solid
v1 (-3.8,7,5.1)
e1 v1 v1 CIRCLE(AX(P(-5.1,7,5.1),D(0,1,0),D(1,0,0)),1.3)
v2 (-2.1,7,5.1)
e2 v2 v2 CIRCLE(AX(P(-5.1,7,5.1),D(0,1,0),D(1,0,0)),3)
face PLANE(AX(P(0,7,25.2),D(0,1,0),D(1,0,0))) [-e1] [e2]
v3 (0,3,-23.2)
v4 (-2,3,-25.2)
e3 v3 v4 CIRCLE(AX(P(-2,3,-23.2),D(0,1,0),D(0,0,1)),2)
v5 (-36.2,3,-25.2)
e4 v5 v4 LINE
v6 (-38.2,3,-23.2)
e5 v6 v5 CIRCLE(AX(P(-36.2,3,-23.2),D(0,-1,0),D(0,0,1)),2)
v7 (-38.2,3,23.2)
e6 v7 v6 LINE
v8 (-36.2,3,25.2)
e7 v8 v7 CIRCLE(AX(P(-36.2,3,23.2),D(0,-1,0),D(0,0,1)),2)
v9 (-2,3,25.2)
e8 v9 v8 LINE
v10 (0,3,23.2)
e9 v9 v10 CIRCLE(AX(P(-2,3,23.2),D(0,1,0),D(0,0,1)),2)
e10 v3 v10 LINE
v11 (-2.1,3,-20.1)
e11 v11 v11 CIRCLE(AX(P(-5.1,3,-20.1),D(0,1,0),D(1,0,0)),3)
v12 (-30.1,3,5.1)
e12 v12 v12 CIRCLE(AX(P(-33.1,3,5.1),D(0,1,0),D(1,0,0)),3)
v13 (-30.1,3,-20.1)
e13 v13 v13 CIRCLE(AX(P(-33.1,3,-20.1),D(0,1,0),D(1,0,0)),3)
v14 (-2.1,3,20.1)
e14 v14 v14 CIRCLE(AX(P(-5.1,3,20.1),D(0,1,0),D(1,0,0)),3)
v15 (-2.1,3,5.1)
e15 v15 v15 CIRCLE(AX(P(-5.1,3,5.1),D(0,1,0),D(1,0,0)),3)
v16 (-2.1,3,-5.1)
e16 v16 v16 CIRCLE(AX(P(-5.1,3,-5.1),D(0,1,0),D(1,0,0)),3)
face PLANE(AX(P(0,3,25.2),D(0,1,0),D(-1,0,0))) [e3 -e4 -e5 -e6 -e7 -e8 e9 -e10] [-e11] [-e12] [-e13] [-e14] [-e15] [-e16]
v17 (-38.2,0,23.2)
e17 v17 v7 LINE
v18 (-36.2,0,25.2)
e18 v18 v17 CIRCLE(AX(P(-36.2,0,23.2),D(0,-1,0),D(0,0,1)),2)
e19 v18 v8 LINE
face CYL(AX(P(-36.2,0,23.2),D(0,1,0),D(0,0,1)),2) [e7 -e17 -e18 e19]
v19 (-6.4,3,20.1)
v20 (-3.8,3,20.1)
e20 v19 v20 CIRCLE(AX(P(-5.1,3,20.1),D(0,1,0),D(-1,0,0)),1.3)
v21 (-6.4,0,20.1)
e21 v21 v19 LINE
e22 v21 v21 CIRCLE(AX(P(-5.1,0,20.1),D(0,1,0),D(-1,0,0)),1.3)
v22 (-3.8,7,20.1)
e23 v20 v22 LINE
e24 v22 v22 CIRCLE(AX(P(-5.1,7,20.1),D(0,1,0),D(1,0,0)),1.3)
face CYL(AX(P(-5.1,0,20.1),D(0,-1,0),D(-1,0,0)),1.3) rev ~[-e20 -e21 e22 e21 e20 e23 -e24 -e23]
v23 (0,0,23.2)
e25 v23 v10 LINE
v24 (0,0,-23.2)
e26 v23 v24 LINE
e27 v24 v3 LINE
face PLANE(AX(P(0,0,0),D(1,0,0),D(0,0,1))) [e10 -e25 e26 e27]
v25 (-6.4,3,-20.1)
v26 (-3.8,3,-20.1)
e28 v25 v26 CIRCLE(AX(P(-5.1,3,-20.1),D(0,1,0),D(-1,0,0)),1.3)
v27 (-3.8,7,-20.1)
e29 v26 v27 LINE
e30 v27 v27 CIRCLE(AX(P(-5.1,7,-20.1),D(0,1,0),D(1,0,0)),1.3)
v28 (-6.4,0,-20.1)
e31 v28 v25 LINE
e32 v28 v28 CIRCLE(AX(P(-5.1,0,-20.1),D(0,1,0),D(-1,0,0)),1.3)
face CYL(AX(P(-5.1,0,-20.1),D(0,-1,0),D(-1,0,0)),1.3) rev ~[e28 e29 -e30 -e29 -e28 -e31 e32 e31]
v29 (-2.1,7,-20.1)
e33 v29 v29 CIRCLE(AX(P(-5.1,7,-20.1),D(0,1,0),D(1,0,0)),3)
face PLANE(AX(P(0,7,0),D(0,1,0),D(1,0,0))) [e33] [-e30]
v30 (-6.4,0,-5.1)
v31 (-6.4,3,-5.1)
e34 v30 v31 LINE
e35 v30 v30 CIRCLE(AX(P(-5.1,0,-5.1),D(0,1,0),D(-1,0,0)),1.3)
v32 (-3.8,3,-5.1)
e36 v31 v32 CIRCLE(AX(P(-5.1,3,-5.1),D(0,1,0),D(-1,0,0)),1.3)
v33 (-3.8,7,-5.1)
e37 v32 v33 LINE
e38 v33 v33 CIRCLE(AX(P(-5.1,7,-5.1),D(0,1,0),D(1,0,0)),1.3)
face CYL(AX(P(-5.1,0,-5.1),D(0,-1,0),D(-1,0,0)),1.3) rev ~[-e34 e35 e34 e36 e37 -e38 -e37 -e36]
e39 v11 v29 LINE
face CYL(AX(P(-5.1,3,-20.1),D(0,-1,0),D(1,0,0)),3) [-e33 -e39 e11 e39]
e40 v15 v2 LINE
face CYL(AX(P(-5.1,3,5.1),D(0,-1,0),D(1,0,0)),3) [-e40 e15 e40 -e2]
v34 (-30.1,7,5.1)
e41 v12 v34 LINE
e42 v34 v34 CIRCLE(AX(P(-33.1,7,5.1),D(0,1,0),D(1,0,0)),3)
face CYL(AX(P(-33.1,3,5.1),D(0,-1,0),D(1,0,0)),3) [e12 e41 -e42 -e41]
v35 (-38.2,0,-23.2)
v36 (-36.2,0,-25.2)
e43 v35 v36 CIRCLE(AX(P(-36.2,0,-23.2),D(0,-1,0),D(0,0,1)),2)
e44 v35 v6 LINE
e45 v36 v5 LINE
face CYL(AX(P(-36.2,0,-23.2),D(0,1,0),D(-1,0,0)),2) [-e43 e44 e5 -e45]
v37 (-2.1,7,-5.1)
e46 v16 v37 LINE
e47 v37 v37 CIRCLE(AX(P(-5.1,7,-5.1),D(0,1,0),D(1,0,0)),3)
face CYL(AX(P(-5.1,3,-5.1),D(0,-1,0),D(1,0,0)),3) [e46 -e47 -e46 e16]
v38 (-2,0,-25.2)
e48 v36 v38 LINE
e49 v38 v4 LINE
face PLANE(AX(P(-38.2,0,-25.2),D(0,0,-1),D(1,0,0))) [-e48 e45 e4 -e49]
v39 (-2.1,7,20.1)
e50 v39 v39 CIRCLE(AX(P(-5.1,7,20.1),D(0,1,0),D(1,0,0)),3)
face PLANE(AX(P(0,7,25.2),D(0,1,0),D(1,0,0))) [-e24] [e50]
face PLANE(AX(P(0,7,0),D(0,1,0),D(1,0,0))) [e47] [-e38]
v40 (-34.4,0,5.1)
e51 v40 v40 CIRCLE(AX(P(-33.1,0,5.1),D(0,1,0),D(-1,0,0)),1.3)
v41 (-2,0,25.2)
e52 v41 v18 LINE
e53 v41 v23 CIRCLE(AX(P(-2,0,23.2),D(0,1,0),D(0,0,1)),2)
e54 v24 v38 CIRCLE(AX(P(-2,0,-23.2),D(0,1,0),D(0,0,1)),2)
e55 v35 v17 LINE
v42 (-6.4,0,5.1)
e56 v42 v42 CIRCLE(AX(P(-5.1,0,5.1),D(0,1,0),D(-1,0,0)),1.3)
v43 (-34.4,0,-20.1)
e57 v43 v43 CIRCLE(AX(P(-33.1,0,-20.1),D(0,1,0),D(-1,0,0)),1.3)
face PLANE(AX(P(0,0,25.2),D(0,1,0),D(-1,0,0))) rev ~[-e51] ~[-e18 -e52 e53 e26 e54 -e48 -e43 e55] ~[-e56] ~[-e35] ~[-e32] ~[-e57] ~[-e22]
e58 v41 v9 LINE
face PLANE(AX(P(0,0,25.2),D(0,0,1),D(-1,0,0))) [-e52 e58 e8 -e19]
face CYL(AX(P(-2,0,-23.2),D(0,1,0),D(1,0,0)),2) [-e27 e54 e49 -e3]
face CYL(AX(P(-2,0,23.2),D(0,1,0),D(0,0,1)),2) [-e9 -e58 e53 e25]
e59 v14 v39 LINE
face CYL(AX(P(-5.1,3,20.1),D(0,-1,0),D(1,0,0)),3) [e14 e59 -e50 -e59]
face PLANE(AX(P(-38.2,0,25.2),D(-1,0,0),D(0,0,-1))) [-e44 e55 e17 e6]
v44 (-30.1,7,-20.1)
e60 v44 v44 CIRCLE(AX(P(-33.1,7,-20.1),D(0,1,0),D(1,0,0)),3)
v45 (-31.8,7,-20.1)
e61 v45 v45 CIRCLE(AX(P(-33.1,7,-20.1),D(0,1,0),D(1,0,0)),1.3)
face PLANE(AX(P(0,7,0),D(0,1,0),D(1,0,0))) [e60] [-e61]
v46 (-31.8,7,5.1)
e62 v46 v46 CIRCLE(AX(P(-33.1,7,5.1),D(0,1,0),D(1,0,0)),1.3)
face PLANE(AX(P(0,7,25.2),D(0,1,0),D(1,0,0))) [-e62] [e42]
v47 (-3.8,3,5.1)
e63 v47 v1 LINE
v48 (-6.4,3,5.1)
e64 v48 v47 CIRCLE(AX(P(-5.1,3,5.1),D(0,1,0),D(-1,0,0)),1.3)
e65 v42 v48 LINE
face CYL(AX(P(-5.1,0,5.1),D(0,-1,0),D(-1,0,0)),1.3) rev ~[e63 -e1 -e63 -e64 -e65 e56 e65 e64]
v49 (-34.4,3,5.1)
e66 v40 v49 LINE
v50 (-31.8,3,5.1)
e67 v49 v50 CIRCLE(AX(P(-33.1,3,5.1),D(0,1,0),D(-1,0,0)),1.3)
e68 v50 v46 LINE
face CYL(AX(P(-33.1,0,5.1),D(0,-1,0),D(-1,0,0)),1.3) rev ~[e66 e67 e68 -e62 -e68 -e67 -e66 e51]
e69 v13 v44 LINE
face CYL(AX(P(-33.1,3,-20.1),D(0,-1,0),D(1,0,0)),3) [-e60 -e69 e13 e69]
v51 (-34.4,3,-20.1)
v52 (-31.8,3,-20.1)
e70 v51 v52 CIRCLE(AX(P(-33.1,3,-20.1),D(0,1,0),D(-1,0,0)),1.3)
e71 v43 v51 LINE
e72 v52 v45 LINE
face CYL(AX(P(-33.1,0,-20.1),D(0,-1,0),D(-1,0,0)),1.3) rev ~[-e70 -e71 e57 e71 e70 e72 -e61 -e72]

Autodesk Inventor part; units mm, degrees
ref_plane "YZ Plane" through (0, 0, 0) normal (1, 0, 0) x (0, 1, 0)
ref_plane "XZ Plane" through (0, 0, 0) normal (0, 1, 0) x (-1, 0, 0)
ref_plane "XY Plane" through (0, 0, 0) normal (0, 0, 1) x (1, 0, 0)
sketch "Sketch1" plane through (0, 0, 0) normal (0, 1, 0) x (-1, 0, 0)
  line L0 (0, 0) -> (38.2, 0)
  line L1 (38.2, 0) -> (38.2, -25.2)
  line L2 (38.2, -25.2) -> (0, -25.2)
  line L3 (0, -25.2) -> (0, 0)
  circle A0 centre (33.1, -20.1) radius 1.3
  circle A1 centre (5.1, -5.1) radius 1.3
  circle A2 centre (5.1, -20.1) radius 1.3
  line L4 (0, 0) -> (38.2, -25.2) construction
  line L5 (38.2, 0) -> (0, -25.2) construction
  line L6 (5.1, -5.1) -> (33.1, -20.1) construction
  point P0 (19.1, -12.6)
  dimension "d1" = 15
  dimension "d2" = 28
  dimension "d3" = 2.6
  dimension "d4" = 2.6
  dimension "d5" = 2.6
  dimension "d18" = 25.2
  dimension "d19" = 38.2
extrude "Extrusion1" add sketch "Sketch1" along normal blind 3
sketch "Sketch2" plane through (0, 3, 0) normal (0, 1, 0) x (1, 0, 0)
  circle A0 centre (-5.1, 5.1) radius 1.3 projected
  circle A1 centre (-5.1, 5.1) radius 3
  circle A2 centre (-5.1, 20.1) radius 1.3 projected
  circle A3 centre (-5.1, 20.1) radius 3
  circle A4 centre (-33.1, 20.1) radius 1.3 projected
  circle A5 centre (-33.1, 20.1) radius 3
  point P0 (0, 0)
  dimension "d12" = 6
  dimension "d13" = 6
  dimension "d14" = 6
extrude "Extrusion2" add sketch "Sketch2" along normal blind 4
pattern_linear "Rectangular Pattern1" count 2 spacing 25.2 along (0, 0, 1) of "Extrusion1", "Extrusion2"
fillet "Fillet2" radius 2 4 edges at (0, 1.5, 25.2) (0, 1.5, -25.2) (-38.2, 1.5, -25.2) (-38.2, 1.5, 25.2)
equation "\"d4\" = d3"
equation "\"d5\" = d3"
equation "\"d13\" = d12"
equation "\"d14\" = d12"
equation "\"d7\" = d8"
equation "\"d8\" = 3"
properties part number "adc_board_rack"
